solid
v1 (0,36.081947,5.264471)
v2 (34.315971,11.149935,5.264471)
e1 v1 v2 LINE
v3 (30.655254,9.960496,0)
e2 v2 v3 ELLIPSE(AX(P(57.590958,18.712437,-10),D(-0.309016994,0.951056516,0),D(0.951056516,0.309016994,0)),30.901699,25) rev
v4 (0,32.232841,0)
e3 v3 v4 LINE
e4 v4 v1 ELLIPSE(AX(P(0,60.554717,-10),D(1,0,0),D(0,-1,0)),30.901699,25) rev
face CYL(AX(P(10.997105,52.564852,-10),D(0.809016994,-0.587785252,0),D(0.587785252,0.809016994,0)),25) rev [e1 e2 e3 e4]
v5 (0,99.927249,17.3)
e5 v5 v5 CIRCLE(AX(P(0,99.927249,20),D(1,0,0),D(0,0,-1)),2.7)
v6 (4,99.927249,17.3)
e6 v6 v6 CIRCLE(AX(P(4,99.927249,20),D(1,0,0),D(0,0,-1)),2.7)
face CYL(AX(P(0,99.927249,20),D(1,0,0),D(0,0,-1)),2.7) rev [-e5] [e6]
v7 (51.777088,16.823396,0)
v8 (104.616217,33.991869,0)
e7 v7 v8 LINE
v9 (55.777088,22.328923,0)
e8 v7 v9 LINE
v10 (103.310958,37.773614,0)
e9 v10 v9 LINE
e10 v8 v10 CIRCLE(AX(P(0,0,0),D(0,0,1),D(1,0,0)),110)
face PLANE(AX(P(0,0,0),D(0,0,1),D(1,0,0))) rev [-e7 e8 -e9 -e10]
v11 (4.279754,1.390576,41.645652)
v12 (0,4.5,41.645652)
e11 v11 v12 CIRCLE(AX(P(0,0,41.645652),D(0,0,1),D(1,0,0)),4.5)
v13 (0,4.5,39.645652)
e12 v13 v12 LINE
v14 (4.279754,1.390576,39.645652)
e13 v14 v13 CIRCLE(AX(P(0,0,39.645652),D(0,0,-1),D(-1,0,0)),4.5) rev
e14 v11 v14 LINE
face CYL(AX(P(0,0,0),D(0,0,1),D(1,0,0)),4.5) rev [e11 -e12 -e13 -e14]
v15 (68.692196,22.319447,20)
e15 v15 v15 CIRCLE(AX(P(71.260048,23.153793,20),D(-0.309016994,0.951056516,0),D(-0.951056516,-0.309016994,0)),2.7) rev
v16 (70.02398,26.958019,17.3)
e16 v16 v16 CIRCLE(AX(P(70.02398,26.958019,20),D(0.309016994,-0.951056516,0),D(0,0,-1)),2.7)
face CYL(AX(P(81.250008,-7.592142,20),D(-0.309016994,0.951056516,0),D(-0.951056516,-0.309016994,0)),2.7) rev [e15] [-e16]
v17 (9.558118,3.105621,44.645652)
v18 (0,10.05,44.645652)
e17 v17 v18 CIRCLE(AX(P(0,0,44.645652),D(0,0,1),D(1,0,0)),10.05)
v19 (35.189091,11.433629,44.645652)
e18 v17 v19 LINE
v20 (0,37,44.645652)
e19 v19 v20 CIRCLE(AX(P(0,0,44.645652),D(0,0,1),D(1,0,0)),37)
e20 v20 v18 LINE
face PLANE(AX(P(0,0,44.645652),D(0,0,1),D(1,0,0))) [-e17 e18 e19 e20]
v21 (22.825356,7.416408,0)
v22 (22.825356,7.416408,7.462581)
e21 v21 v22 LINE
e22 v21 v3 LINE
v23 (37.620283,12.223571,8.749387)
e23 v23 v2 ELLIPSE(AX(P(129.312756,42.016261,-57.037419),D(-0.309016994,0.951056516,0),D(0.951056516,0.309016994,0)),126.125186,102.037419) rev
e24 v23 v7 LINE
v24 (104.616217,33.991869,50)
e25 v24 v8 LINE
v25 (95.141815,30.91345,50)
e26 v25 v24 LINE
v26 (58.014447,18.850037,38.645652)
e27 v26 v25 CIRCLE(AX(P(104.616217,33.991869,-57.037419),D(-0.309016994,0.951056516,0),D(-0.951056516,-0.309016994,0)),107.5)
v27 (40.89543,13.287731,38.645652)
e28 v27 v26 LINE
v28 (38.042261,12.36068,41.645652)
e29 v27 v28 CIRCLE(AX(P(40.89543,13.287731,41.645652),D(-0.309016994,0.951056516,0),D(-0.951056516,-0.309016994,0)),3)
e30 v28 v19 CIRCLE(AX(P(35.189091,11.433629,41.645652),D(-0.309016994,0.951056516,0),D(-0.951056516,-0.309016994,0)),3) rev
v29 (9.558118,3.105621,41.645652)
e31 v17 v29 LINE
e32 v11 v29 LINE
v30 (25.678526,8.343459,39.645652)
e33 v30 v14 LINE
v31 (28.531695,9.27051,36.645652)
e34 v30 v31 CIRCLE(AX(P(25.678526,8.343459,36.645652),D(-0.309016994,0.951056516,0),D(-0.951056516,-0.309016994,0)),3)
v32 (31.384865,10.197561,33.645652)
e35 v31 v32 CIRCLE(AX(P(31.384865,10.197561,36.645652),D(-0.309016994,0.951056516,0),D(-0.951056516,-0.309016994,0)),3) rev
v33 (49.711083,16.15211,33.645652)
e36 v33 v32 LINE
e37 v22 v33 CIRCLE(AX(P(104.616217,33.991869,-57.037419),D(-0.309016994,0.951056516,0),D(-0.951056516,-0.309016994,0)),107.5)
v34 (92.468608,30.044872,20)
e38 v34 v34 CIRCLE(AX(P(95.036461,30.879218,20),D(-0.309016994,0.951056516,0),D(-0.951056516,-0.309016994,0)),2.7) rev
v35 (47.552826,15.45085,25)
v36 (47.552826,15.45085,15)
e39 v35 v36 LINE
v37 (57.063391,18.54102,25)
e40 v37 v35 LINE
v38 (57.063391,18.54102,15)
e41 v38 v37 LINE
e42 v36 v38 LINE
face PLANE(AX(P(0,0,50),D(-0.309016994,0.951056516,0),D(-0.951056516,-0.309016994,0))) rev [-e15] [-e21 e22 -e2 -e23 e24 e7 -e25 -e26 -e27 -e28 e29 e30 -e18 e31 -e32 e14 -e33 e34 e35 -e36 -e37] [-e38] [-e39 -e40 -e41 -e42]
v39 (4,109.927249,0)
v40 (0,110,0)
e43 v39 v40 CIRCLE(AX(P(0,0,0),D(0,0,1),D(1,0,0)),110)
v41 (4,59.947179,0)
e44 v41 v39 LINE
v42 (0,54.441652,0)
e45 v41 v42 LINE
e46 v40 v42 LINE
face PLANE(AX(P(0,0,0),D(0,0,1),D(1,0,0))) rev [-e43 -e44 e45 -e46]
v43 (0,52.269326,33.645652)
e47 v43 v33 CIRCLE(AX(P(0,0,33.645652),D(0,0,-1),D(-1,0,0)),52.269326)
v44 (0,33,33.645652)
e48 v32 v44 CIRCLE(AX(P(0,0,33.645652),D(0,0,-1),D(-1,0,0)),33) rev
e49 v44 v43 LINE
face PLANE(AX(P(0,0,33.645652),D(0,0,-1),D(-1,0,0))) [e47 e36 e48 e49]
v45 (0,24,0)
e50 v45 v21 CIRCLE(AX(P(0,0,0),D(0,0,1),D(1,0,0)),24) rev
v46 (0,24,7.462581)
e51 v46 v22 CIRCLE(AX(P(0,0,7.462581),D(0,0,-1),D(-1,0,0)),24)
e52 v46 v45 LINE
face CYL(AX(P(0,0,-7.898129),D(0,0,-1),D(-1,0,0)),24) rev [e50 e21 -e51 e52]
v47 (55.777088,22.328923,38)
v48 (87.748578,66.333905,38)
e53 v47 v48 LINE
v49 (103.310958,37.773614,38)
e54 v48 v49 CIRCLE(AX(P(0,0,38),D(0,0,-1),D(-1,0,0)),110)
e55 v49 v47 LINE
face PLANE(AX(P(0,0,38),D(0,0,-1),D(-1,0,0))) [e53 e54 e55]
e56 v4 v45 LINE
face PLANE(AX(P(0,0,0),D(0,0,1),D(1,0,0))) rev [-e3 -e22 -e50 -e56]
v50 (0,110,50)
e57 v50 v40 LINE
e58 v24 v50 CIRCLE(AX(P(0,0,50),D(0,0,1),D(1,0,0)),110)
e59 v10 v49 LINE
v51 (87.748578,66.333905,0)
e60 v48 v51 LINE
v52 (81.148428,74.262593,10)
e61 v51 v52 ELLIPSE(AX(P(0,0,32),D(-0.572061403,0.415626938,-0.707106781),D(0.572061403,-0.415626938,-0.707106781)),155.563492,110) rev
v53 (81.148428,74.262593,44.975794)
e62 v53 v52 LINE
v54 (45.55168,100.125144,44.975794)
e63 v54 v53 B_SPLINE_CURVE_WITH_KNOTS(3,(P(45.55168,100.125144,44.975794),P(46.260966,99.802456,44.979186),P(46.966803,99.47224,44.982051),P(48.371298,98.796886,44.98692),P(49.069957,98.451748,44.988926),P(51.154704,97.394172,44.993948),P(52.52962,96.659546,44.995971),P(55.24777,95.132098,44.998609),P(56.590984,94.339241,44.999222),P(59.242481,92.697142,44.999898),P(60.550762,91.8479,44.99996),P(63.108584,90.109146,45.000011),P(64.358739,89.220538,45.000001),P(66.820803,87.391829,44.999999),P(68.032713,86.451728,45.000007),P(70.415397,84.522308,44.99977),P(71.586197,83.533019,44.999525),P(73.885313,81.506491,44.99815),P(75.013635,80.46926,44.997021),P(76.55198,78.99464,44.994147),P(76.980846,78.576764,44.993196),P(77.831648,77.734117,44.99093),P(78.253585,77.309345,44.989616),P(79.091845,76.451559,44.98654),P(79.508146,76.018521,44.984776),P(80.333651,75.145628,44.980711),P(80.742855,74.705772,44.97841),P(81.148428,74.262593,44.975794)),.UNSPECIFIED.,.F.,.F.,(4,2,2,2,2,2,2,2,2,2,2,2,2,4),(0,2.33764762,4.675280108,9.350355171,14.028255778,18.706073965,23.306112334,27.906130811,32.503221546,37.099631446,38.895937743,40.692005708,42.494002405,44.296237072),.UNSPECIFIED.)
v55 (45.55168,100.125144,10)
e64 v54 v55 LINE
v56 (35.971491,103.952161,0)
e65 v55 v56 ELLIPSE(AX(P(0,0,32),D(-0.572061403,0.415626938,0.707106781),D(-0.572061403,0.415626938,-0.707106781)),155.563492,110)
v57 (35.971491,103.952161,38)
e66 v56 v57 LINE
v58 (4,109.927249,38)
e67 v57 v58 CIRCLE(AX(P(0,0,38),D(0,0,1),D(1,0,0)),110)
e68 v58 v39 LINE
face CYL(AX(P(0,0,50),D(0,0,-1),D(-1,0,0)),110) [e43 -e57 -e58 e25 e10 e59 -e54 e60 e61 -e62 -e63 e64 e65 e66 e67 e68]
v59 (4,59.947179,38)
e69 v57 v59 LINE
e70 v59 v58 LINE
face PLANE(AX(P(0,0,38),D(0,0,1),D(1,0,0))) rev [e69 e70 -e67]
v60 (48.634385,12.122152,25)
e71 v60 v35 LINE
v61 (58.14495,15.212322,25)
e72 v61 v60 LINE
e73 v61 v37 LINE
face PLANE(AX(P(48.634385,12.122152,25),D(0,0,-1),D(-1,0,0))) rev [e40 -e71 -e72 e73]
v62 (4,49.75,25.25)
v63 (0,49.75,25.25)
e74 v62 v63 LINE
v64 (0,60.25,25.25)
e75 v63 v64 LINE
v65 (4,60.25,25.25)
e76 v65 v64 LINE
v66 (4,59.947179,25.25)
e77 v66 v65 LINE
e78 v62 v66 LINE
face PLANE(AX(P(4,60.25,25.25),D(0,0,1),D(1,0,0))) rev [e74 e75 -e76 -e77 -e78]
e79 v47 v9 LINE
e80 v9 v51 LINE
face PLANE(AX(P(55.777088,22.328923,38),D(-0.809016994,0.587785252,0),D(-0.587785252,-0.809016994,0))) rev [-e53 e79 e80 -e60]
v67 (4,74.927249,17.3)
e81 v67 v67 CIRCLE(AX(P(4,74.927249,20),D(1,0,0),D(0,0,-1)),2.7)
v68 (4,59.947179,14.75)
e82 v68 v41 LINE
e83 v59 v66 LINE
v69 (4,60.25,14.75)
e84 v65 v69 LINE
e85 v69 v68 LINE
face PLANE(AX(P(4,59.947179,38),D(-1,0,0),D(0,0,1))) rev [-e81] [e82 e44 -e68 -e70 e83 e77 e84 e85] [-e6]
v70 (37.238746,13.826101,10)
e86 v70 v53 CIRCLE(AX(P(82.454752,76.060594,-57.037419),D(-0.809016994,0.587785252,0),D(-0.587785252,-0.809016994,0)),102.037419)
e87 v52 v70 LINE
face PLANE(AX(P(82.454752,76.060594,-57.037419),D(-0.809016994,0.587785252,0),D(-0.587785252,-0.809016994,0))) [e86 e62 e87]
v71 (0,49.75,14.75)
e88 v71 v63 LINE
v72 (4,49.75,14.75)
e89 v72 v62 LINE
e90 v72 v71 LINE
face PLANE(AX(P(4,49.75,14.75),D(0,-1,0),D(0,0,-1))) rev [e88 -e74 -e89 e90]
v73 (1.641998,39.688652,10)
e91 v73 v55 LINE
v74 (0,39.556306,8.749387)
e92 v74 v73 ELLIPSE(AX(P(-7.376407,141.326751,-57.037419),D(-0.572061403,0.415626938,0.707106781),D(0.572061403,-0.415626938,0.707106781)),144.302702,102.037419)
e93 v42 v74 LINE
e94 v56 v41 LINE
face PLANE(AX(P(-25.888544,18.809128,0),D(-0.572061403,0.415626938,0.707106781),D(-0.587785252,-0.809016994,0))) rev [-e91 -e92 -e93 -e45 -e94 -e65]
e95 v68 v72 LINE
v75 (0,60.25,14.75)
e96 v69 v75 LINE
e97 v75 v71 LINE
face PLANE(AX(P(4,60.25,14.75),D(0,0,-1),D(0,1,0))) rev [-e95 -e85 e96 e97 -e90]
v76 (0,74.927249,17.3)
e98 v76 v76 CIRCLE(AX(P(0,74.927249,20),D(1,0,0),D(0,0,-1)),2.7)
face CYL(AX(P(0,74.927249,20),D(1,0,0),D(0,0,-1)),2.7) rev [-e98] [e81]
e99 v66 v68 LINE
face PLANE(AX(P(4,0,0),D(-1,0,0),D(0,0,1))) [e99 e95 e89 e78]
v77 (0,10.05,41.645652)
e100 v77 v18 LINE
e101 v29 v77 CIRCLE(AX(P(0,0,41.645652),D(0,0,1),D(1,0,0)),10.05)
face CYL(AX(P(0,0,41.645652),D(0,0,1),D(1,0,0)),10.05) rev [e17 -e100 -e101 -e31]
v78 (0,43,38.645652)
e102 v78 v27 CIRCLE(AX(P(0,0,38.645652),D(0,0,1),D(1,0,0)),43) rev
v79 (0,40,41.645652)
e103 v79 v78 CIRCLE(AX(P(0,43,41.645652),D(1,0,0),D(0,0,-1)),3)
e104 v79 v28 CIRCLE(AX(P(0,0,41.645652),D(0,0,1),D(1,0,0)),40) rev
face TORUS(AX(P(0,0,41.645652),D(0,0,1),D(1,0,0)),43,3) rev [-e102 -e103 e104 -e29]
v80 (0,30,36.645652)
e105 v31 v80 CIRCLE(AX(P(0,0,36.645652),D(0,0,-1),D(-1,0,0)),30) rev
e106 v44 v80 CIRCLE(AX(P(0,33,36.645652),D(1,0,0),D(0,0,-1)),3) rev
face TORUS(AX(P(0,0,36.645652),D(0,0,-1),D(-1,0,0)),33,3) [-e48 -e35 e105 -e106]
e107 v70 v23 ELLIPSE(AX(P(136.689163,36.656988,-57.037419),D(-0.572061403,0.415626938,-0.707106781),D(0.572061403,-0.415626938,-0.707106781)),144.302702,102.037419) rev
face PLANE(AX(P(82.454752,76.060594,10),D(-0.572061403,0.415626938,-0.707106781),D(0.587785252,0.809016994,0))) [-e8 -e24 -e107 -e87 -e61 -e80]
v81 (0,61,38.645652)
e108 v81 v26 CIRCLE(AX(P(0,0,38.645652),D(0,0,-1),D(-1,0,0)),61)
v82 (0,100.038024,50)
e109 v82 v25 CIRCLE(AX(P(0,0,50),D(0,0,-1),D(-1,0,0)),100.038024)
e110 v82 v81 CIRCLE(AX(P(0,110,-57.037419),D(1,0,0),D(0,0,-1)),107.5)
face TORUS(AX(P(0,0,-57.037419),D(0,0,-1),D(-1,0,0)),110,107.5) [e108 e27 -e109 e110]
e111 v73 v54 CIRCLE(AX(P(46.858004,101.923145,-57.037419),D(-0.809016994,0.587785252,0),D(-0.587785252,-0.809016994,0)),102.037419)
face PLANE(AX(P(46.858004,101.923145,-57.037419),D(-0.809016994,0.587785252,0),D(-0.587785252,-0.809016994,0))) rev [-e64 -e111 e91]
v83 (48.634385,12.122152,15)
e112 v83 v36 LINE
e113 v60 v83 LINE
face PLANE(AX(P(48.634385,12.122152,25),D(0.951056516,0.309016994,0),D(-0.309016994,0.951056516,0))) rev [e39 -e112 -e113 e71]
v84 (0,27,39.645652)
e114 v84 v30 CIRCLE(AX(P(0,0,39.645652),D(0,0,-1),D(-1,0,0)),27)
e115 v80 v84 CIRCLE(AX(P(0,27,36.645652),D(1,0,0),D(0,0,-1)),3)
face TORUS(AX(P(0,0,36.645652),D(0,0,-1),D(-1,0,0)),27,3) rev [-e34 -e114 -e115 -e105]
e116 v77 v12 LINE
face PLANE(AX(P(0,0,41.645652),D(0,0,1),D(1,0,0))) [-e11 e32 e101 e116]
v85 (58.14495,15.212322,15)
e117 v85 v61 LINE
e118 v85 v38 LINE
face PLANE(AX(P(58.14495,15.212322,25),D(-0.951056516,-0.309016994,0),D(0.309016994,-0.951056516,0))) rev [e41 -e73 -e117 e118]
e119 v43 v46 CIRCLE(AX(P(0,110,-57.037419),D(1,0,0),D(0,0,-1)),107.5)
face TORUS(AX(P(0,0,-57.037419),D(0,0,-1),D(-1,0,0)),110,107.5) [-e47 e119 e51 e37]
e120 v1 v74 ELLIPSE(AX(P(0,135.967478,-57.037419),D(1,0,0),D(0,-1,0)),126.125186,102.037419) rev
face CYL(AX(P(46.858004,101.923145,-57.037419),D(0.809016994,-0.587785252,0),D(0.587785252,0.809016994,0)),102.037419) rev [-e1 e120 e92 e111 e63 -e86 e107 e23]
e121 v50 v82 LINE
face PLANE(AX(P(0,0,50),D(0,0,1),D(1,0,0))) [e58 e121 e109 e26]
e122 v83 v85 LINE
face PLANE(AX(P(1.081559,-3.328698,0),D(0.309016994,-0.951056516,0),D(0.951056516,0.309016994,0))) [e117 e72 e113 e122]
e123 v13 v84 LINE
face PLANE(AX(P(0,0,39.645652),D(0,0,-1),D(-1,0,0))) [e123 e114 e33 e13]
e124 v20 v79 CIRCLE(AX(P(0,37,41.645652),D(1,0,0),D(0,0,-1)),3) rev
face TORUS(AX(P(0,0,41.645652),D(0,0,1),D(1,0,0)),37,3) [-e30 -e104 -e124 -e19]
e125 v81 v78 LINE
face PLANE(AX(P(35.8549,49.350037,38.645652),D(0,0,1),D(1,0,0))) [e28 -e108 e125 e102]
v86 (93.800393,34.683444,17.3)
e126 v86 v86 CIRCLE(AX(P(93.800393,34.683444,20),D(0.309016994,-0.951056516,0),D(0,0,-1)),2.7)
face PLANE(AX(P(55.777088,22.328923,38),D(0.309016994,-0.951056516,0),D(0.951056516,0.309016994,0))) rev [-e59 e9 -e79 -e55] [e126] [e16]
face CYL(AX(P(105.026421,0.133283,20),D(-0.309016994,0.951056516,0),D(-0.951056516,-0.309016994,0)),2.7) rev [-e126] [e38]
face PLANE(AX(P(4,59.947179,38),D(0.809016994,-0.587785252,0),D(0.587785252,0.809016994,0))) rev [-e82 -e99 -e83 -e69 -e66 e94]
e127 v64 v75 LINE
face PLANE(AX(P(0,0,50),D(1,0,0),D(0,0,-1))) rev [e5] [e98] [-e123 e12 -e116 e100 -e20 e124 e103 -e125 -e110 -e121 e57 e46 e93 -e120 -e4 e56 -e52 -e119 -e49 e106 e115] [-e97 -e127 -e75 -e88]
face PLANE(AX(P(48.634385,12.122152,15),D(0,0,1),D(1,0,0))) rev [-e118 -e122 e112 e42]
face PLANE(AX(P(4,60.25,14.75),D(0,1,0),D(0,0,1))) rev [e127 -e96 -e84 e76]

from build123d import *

# Parameters (mm, degrees)
EXTRUDE_1_DEPTH          = 50
CUT_EXTRUDE_1_DEPTH      = 22
CUT_EXTRUDE_1_DEPTH_BACK = 22
CHAMFER_1_SIZE           = 10
CUT_EXTRUDE_4_DEPTH      = 38
SKETCH_7_R               = 2.7
CUT_EXTRUDE_5_DEPTH      = 158.237473694
SKETCH_12_W              = 10.5
SKETCH_12_H              = 10.5
CUT_EXTRUDE_8_DEPTH      = 4
SKETCH_13_W              = 10
SKETCH_13_H              = 10
EXTRUDE_3_DEPTH          = 3.5
EXTRUDE_4_DEPTH          = 6
SKETCH_16_R              = 10.05
CUT_EXTRUDE_11_DEPTH     = 3
SKETCH_17_R              = 4.5
CUT_EXTRUDE_12_DEPTH     = 158.41319251
SKETCH_18_R              = 30
CUT_EXTRUDE_13_DEPTH     = 6
FILLET_1_2_ANGLE         = 72
FILLET_1_3_ANGLE         = 72
FILLET_1_4_ANGLE         = 72


with BuildPart() as part:
    # 草图1 → 凸台-拉伸1 (new body)
    with BuildSketch(Plane.XY):
        with BuildLine():
            Line((0, 0), (0, 110))
            ThreePointArc((0, 110), (64.656377752, 88.991869381), (104.616216792, 33.991869381))
            Line((104.616216792, 33.991869381), (0, 0))
        make_face()
    extrude(amount=EXTRUDE_1_DEPTH)

    # 草图2 → 切除-拉伸1 (cut, two sides: drawn at the far end of the back side and taken through both)
    with BuildSketch(Plane(origin=(0, 0, 0), x_dir=(0, 0, 1), z_dir=(-0.8090169943749467, 0.5877852522924744, 0)).offset(-CUT_EXTRUDE_1_DEPTH_BACK)):
        with BuildLine():
            Line((-2.434479972, 121.031505263), (-32.434479972, 60.021300119))
            ThreePointArc((-32.434479972, 60.021300119), (-25.826576487, 29.63728916), (5.26447133, 29.190908144))
            ThreePointArc((5.26447133, 29.190908144), (34.528838333, 64.97494707), (45, 110))
            ThreePointArc((45, 110), (25.662949792, 134.35017453), (-2.434479972, 121.031505263))
        make_face()
    extrude(amount=CUT_EXTRUDE_1_DEPTH + CUT_EXTRUDE_1_DEPTH_BACK, mode=Mode.SUBTRACT)

    # 倒角1
    # the kernel refuses this chamfer: 10 mm, written as the material it takes off along each edge
    with BuildSketch(Plane(origin=(-15.115973339, 16.623283153, 0), x_dir=(0, 0, 1), z_dir=(0.5877852522924744, 0.8090169943749467, 0))) as chamfer_1_piece_1_section:
        Polygon((CHAMFER_1_SIZE, 0), (0, -CHAMFER_1_SIZE), (0, 0), align=None)
    chamfer_1_piece_1 = extrude(amount=128.930806191, mode=Mode.PRIVATE)
    chamfer_1_piece_1 = chamfer_1_piece_1 & Plane(origin=(46.858003876, 101.923144932, -57.037418863), x_dir=(-0.4654997448337989, -0.6407054327731835, 0.6105788531996469), z_dir=(0.8090169943749466, -0.5877852522924744, 0)) * Cylinder(102.037418863, 298, mode=Mode.PRIVATE)
    add(chamfer_1_piece_1, mode=Mode.SUBTRACT)
    with BuildSketch(Plane(origin=(20.480774414, -9.239267947, 0), x_dir=(0, 0, 1), z_dir=(0.5877852522924744, 0.8090169943749467, 0))) as chamfer_1_piece_2_section:
        Polygon((CHAMFER_1_SIZE, 0), (0, CHAMFER_1_SIZE), (0, 0), align=None)
    chamfer_1_piece_2 = extrude(amount=128.930806191, mode=Mode.PRIVATE)
    chamfer_1_piece_2 = chamfer_1_piece_2 & Plane(origin=(82.454751628, 76.060593831, -57.037418863), x_dir=(-0.4654997448337989, -0.6407054327731835, 0.6105788531996469), z_dir=(0.8090169943749466, -0.5877852522924744, 0)) * Cylinder(102.037418863, 298, mode=Mode.PRIVATE)
    add(chamfer_1_piece_2, mode=Mode.SUBTRACT)

    # 草图5 → 切除-旋转2 (revolve, cut)
    with BuildSketch(Plane(origin=(0, 0, 0), x_dir=(0, 0, 1), z_dir=(-0.8090169943749467, 0.5877852522924744, 0))):
        with BuildLine():
            Line((38.64565174, 61), (38.64565174, 0))
            Line((38.64565174, 0), (50.462581137, 0))
            Line((50.462581137, 0), (50.462581137, 110))
            ThreePointArc((50.462581137, 110), (47.466600414, 84.797620051), (38.64565174, 61))
        make_face()
        with BuildLine():
            Line((-5, 24), (-5, 0))
            Line((-5, 0), (33.64565174, 0))
            Line((33.64565174, 0), (33.64565174, 52.269326125))
            ThreePointArc((33.64565174, 52.269326125), (21.831047905, 36.951968201), (7.462581137, 24))
            Line((7.462581137, 24), (-5, 24))
        make_face()
    revolve(axis=Axis((0, 0, -7.898129057), (0, 0, 1)), mode=Mode.SUBTRACT)

    # 草图6 → 切除-拉伸4 (cut)
    with BuildSketch(Plane(origin=(0, 0, 0), x_dir=(-1, 0, 0), z_dir=(0, 0, -1))):
        Polygon((-4, 59.947179416), (-4, 121.087474703), (-38.681182805, 107.68173241), align=None)
        Polygon((-90.458270445, 70.063476264), (-113.924963881, 41.222313554), (-55.77708764, 22.32892327), align=None)
    extrude(amount=-CUT_EXTRUDE_4_DEPTH, mode=Mode.SUBTRACT)

    # 草图7 → 切除-拉伸5 (cut, through all)
    with BuildSketch(Plane(origin=(4, 0, 0), x_dir=(0, 0, -1), z_dir=(1, 0, 0))):
        with Locations((-20, 99.927248669)):
            Circle(SKETCH_7_R)
        with Locations((-20, 74.927248669)):
            Circle(SKETCH_7_R)
    cut_extrude_5 = extrude(amount=-CUT_EXTRUDE_5_DEPTH, mode=Mode.SUBTRACT)

    # 镜向1: 切除-拉伸5 across plane
    add(cut_extrude_5.mirror(Plane(origin=(0, 0, 0), x_dir=(0, 0, 1), z_dir=(-0.8090169943749466, 0.5877852522924742, 0))), mode=Mode.SUBTRACT)

    # 草图12 → 切除-拉伸8 (cut)
    with BuildSketch(Plane.ZY):
        with Locations((20, 55)):
            Rectangle(SKETCH_12_W, SKETCH_12_H)
    extrude(amount=-CUT_EXTRUDE_8_DEPTH, mode=Mode.SUBTRACT)

    # 草图13 → 凸台-拉伸3 (add)
    with BuildSketch(Plane(origin=(0, 0, 0), x_dir=(0.9510565162951544, 0.30901699437494484, 0), z_dir=(0.30901699437494484, -0.9510565162951544, 0))):
        with Locations((55, 20)):
            Rectangle(SKETCH_13_W, SKETCH_13_H)
    extrude(amount=EXTRUDE_3_DEPTH)

    # 草图14 → 凸台-拉伸4 (add)
    with BuildSketch(Plane.XY.offset(38.64565174)):
        with BuildLine():
            Line((0, 0), (0, 40))
            ThreePointArc((0, 40), (23.511410092, 32.360679775), (38.042260652, 12.360679775))
            Line((38.042260652, 12.360679775), (0, 0))
        make_face()
    extrude(amount=EXTRUDE_4_DEPTH)

    # 草图16 → 切除-拉伸11 (cut)
    with BuildSketch(Plane.XY.offset(44.64565174)):
        Circle(SKETCH_16_R)
    extrude(amount=-CUT_EXTRUDE_11_DEPTH, mode=Mode.SUBTRACT)

    # 草图17 → 切除-拉伸12 (cut, through all)
    with BuildSketch(Plane.XY.offset(41.64565174)):
        Circle(SKETCH_17_R)
    extrude(amount=-CUT_EXTRUDE_12_DEPTH, mode=Mode.SUBTRACT)

    # 草图18 → 切除-拉伸13 (cut)
    with BuildSketch(Plane(origin=(0, 0, 33.64565174), x_dir=(-1, 0, 0), z_dir=(0, 0, -1))):
        Circle(SKETCH_18_R)
    extrude(amount=-CUT_EXTRUDE_13_DEPTH, mode=Mode.SUBTRACT)

    # 圆角1: read off the stored shape, not the designer's step
    # 圆角1 outline → 圆角1 (revolve, cut)
    with BuildSketch(Plane.XZ):
        with BuildLine():
            ThreePointArc((30, 36.64565174), (29.802517077, 37.716118009), (29.236067978, 38.64565174))
            Line((29.236067978, 38.64565174), (27, 38.64565174))
            Line((27, 38.64565174), (27, 33.64565174))
            Line((27, 33.64565174), (33, 33.64565174))
            ThreePointArc((33, 33.64565174), (30.878679657, 34.524331396), (30, 36.64565174))
        make_face()
    revolve(axis=Axis((0, 0, 0), (0, 0, 1)), mode=Mode.SUBTRACT)

    # Fillet 1 2 outline → Fillet 1 2 (revolve)
    with BuildSketch(Plane(origin=(0, 0, 0), x_dir=(0.9510565162951545, 0.30901699437494434, 0), z_dir=(0.30901699437494434, -0.9510565162951545, 0))):
        with BuildLine():
            Line((30, 39.64565174), (27, 39.64565174))
            ThreePointArc((27, 39.64565174), (29.121320344, 38.766972084), (30, 36.64565174))
            Line((30, 36.64565174), (30, 39.64565174))
        make_face()
    revolve(axis=Axis((0, 0, 0), (0, 0, 1)), revolution_arc=FILLET_1_2_ANGLE)

    # Fillet 1 3 outline → Fillet 1 3 (revolve)
    with BuildSketch(Plane(origin=(0, 0, 0), x_dir=(0.9510565162951548, 0.30901699437494395, 0), z_dir=(0.30901699437494395, -0.9510565162951548, 0))):
        with BuildLine():
            ThreePointArc((43, 38.64565174), (40.878679657, 39.524331397), (40, 41.64565174))
            ThreePointArc((40, 41.64565174), (39.121320344, 43.766972084), (37, 44.64565174))
            Line((37, 44.64565174), (37, 38.64565174))
            Line((37, 38.64565174), (43, 38.64565174))
        make_face()
    revolve(axis=Axis((0, 0, 0), (0, 0, 1)), revolution_arc=FILLET_1_3_ANGLE)

    # Fillet 1 4 outline → Fillet 1 4 (revolve, cut)
    with BuildSketch(Plane(origin=(0, 0, 0), x_dir=(0.9510565162951548, 0.30901699437494395, 0), z_dir=(0.30901699437494395, -0.9510565162951548, 0))):
        with BuildLine():
            ThreePointArc((37, 44.64565174), (39.121320344, 43.766972084), (40, 41.64565174))
            ThreePointArc((40, 41.64565174), (40.878679657, 39.524331397), (43, 38.64565174))
            Line((43, 38.64565174), (43, 44.64565174))
            Line((43, 44.64565174), (37, 44.64565174))
        make_face()
    revolve(axis=Axis((0, 0, 0), (0, 0, 1)), revolution_arc=FILLET_1_4_ANGLE, mode=Mode.SUBTRACT)


solid = part.part
